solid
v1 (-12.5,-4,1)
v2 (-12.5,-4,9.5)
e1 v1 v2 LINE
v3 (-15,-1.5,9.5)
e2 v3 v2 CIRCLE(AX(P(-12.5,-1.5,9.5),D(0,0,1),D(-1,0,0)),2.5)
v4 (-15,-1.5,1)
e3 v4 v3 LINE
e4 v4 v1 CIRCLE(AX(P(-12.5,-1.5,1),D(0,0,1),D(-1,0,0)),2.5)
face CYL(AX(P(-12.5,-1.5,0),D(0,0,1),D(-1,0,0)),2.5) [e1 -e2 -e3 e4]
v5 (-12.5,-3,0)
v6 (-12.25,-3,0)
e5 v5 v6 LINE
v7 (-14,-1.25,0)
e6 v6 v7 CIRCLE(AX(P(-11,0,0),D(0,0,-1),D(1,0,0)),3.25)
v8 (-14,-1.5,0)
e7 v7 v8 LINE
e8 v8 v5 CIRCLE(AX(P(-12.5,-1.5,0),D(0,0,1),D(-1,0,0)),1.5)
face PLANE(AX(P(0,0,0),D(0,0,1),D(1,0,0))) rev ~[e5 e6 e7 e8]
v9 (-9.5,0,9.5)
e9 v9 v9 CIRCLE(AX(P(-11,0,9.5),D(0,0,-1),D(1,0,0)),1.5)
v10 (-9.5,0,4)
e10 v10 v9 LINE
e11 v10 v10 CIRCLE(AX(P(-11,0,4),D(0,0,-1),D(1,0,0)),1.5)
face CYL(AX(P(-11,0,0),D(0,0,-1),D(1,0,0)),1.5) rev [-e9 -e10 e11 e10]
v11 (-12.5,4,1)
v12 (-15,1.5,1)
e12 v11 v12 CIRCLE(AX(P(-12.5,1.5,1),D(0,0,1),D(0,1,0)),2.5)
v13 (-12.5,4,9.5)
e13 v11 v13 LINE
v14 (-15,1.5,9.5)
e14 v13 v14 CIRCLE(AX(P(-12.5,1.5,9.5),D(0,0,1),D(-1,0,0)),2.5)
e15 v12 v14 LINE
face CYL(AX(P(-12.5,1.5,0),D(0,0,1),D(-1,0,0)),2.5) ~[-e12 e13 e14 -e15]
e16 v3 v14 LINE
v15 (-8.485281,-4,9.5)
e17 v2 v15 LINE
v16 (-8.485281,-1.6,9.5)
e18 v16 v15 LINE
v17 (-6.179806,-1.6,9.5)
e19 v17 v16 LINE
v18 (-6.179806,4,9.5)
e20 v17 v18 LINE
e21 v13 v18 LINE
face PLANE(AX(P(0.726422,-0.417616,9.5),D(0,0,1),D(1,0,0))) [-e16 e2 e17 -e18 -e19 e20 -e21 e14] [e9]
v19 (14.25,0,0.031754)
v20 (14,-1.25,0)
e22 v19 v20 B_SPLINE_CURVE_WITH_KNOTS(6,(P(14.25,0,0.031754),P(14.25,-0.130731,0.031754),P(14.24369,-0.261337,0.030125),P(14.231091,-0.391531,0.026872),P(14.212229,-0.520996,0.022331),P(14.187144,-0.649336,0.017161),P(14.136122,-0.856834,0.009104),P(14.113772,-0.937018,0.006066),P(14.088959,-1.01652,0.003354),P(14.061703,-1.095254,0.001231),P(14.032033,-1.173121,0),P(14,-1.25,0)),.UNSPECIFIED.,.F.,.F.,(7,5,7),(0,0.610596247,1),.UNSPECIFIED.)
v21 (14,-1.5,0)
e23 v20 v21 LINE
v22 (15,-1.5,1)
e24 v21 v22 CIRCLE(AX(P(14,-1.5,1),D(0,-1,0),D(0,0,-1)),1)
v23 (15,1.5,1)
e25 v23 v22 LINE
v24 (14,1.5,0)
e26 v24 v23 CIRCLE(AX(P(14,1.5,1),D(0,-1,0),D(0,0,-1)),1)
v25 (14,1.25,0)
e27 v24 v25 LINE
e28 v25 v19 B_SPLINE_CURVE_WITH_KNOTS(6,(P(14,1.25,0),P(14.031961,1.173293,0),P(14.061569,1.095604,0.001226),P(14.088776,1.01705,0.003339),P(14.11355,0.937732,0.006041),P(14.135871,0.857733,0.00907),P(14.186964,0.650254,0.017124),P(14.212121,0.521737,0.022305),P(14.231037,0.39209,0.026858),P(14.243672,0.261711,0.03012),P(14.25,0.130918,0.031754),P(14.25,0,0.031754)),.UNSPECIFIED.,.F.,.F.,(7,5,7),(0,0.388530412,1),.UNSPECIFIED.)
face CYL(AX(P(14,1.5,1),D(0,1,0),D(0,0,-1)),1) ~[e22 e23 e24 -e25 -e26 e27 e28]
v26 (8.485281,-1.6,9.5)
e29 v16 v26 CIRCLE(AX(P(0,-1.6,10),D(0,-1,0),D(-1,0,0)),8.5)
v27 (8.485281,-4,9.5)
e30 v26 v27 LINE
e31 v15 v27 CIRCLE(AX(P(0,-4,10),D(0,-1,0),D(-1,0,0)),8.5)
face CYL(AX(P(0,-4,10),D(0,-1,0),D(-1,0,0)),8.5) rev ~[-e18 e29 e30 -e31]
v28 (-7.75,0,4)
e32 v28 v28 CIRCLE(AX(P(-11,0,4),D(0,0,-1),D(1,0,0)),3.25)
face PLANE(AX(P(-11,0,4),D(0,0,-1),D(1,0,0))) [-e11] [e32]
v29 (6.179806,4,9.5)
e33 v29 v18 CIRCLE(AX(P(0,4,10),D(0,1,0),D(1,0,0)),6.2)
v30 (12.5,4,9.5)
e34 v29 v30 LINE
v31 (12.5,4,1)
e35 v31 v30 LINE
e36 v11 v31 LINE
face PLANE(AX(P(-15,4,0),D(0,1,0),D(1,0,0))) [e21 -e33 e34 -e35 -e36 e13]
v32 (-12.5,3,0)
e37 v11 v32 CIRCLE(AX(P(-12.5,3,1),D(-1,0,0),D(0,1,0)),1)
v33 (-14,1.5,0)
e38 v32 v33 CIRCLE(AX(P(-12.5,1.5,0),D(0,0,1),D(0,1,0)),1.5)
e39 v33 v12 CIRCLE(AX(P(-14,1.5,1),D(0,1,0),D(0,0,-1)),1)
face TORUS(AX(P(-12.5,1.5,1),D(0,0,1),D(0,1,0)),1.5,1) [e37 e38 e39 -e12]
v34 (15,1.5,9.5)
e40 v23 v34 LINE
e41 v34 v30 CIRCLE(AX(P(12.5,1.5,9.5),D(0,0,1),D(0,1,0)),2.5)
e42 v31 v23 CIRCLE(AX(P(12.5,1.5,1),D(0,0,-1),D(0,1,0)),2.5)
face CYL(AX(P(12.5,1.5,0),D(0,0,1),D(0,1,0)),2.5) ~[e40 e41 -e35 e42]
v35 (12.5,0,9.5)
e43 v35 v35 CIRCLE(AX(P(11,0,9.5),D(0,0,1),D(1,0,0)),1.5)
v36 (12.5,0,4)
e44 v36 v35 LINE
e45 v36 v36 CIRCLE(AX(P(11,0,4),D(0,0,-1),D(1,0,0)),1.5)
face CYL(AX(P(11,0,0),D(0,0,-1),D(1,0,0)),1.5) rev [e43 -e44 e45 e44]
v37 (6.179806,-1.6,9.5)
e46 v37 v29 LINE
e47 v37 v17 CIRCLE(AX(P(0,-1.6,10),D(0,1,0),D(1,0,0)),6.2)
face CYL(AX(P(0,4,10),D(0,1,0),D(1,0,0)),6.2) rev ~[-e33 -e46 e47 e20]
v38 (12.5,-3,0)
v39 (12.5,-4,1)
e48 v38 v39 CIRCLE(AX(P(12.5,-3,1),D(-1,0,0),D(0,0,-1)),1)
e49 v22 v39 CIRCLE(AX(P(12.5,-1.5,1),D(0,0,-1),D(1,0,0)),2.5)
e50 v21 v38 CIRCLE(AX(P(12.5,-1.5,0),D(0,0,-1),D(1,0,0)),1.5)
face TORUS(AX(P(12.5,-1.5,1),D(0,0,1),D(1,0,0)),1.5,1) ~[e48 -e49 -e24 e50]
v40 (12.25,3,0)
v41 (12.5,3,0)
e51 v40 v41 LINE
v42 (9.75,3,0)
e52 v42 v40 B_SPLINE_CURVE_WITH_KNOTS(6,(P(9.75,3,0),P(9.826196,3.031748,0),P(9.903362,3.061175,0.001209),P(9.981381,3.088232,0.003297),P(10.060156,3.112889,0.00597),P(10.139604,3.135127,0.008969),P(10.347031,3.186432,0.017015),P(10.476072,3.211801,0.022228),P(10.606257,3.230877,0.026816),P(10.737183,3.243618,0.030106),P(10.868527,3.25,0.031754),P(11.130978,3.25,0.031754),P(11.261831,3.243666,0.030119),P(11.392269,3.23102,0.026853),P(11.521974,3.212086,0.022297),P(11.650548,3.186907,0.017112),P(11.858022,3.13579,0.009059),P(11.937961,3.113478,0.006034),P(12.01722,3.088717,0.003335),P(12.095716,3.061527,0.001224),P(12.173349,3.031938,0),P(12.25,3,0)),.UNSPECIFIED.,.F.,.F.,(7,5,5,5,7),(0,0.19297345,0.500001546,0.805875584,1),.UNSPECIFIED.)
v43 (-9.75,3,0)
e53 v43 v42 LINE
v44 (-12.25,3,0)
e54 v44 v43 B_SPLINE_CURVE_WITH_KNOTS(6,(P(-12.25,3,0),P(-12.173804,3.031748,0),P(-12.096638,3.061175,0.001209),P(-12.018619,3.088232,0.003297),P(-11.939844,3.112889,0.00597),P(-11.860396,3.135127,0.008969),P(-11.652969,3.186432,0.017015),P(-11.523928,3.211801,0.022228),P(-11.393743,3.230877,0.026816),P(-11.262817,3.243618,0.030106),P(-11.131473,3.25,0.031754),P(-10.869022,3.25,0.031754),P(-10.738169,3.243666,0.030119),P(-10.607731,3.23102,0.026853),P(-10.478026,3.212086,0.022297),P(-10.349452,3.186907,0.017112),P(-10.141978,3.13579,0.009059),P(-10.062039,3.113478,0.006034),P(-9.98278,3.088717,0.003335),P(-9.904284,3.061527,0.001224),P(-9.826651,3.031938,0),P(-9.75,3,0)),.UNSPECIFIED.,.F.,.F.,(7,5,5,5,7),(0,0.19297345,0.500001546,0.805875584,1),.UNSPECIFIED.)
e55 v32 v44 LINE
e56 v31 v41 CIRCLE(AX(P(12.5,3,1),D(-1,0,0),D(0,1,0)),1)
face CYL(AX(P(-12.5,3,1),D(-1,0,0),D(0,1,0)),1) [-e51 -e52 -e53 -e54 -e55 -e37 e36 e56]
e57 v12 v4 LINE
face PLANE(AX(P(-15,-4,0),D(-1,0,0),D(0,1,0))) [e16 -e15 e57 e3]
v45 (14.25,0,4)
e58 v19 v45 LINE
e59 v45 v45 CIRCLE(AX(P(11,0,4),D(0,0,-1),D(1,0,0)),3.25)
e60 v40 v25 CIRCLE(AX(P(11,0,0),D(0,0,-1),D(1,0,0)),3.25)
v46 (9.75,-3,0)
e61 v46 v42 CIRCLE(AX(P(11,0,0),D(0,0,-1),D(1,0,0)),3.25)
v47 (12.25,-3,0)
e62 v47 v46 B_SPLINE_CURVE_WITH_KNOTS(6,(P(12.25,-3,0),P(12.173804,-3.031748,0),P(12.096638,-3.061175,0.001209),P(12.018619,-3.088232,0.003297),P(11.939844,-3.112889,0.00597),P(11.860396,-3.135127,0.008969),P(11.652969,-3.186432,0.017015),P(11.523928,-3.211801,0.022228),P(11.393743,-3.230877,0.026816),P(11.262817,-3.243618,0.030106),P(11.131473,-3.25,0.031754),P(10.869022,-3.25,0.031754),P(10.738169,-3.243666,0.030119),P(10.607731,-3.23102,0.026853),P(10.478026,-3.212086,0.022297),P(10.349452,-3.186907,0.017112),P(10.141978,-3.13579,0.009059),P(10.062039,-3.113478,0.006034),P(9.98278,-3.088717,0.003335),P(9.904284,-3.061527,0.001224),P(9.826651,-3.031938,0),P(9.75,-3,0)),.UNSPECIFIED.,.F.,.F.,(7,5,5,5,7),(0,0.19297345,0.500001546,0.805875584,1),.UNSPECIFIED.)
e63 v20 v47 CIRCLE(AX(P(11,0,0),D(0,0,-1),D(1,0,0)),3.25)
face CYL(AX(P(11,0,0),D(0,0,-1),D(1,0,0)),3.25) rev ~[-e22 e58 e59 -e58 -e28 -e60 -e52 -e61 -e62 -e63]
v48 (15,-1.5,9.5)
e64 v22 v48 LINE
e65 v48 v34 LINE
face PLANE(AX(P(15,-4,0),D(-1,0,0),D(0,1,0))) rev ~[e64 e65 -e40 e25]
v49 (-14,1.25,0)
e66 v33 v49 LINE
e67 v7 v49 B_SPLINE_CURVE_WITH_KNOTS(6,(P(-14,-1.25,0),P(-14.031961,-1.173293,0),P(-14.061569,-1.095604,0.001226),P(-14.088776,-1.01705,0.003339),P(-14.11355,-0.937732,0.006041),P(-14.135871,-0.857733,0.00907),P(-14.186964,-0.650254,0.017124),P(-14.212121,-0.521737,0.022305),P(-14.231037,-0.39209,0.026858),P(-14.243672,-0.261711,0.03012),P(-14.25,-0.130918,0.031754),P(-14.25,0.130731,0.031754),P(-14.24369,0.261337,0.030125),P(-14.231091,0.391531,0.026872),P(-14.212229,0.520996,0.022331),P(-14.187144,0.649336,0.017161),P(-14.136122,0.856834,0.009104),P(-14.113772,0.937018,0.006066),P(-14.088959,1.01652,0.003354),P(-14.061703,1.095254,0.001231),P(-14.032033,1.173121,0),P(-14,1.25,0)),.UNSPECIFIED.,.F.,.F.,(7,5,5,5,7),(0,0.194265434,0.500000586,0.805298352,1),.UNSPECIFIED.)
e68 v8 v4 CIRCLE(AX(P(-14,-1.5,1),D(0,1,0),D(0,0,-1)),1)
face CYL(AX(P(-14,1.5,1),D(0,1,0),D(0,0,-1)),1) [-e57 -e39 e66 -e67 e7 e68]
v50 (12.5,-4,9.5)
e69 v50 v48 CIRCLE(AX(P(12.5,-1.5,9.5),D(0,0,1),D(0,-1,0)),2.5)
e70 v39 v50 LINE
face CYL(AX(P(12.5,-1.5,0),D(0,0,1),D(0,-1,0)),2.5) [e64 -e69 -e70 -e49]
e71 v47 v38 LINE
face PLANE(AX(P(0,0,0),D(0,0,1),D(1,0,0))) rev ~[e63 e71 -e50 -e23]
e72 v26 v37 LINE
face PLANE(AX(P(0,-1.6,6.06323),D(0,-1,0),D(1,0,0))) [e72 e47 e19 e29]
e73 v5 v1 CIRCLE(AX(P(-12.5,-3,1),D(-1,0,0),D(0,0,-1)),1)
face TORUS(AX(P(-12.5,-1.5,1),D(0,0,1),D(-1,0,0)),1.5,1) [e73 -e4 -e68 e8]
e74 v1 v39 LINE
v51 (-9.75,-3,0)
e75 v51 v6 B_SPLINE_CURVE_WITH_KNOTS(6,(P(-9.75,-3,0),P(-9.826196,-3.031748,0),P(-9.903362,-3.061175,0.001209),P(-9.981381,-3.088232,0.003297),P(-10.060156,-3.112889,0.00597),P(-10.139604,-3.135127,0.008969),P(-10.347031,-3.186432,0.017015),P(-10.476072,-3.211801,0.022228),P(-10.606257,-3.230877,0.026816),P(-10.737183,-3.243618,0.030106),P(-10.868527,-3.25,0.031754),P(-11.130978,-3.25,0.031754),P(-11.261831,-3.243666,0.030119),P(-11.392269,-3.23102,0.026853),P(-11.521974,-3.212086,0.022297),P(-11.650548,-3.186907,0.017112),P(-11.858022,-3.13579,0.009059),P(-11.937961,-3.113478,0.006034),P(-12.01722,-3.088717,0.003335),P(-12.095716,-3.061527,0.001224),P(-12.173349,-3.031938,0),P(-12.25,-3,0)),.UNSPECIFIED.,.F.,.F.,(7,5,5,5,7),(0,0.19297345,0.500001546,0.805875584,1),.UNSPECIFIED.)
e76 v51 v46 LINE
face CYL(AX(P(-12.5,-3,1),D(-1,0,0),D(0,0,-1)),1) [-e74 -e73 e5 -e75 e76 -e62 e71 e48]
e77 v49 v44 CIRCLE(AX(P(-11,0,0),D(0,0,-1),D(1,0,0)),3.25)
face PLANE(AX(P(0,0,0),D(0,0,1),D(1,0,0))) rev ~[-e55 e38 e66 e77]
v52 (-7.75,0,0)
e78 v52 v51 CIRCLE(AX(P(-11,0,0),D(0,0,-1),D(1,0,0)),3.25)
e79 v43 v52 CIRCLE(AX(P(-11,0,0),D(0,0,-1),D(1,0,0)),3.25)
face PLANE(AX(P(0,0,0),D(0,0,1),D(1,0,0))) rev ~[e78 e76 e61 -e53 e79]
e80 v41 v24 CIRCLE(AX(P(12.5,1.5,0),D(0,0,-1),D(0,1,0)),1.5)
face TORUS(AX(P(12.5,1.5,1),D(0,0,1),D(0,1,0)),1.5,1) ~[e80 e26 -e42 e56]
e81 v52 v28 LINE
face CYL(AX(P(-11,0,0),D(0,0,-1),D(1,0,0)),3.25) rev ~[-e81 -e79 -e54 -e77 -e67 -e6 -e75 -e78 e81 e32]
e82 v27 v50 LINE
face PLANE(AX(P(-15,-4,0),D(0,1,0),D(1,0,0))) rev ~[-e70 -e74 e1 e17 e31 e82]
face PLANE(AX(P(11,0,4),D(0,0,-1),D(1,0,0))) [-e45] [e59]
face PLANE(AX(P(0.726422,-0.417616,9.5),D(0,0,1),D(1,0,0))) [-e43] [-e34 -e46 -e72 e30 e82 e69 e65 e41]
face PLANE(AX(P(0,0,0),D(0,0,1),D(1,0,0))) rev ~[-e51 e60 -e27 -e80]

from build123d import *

# Parameters (mm, degrees)
F0_W         = 30
F0_H         = 8
F0_R         = 1.5
F1_DEPTH     = 10
F2_R         = 3.25
F2_R_2       = 1.5
F3_DEPTH     = 4
F5_DEPTH     = 8.001
F7_DEPTH     = 2.4
F8_R         = 2.5
F9_T1_DEPTH  = 3
F9_T3_DEPTH  = 25
F9_T6_ANGLE  = 90
F9_T8_ANGLE  = 90
F9_T10_ANGLE = 90
F9_T12_ANGLE = 90
F10_W        = 35.437501967
F10_H        = 11.6335232742
F10_R        = 1.5
F11_DEPTH    = 0.5


# Not quite as in the source:
# - a fillet or chamfer that OpenCascade refuses, or shapes differently, is made with other operations: its cross-section is extruded or revolved along the edge and cut away or added


with BuildPart() as f1:
    # F0 (on Top) → F1 (new body)
    with BuildSketch(Plane.XY):
        Rectangle(F0_W, F0_H)
        with Locations((-11, 0)):
            Circle(F0_R, mode=Mode.SUBTRACT)
        with Locations((11, 0)):
            Circle(F0_R, mode=Mode.SUBTRACT)
    extrude(amount=F1_DEPTH)

    # F2 (on face) → F3 (cut)
    with BuildSketch(Plane(origin=(0, 0, 0), x_dir=(1, 0, 0), z_dir=(0, 0, -1))):
        with Locations((11, 0)):
            Circle(F2_R)
        with Locations((11, 0)):
            Circle(F2_R_2, mode=Mode.SUBTRACT)
        with Locations((-11, 0)):
            Circle(F2_R)
        with Locations((-11, 0)):
            Circle(F2_R_2, mode=Mode.SUBTRACT)
    extrude(amount=-F3_DEPTH, mode=Mode.SUBTRACT)

    # F4 (on face) → F5 (cut, through all)
    with BuildSketch(Plane(origin=(0, 4, 0), x_dir=(-1, 0, 0), z_dir=(0, 1, 0))):
        with BuildLine():
            ThreePointArc((-6.2, 10), (0, 3.8), (6.2, 10))
            Line((6.2, 10), (-6.2, 10))
        make_face()
    extrude(amount=-F5_DEPTH, mode=Mode.SUBTRACT)

    # F6 (on face) → F7 (cut)
    with BuildSketch(Plane.XZ.offset(4)):
        with BuildLine():
            ThreePointArc((-8.5, 10), (0, 1.5), (8.5, 10))
            Line((8.5, 10), (6.2, 10))
            ThreePointArc((6.2, 10), (0, 3.8), (-6.2, 10))
            Line((-6.2, 10), (-8.5, 10))
        make_face()
    extrude(amount=-F7_DEPTH, mode=Mode.SUBTRACT)

    # F8
    f8_edges = [f1.edges().sort_by_distance(p)[0] for p in [
        (15, 4, 5),
        (15, -4, 5),
        (-15, 4, 5),
        (-15, -4, 5),
    ]]
    fillet(f8_edges, radius=F8_R)

    # F9: fillet of radius 1 on 8 edges, made by hand

    # F9_s2 → F9_t1 (cut)
    with BuildSketch(Plane.XZ.offset(-1.5)):
        with BuildLine():
            ThreePointArc((14, 0), (14.7071067812, 0.2928932188), (15, 1))
            Line((15, 1), (15, 0))
            Line((15, 0), (14, 0))
        make_face()
        with BuildLine():
            ThreePointArc((-14, 0), (-14.7071067812, 0.2928932188), (-15, 1))
            Line((-15, 1), (-15, 0))
            Line((-15, 0), (-14, 0))
        make_face()
    extrude(amount=F9_T1_DEPTH, mode=Mode.SUBTRACT)

    # F9_s4 → F9_t3 (cut)
    with BuildSketch(Plane.YZ.offset(-12.5)):
        with BuildLine():
            ThreePointArc((4, 1), (3.7071067812, 0.2928932188), (3, 0))
            Line((3, 0), (4, 0))
            Line((4, 0), (4, 1))
        make_face()
        with BuildLine():
            ThreePointArc((-3, 0), (-3.7071067812, 0.2928932188), (-4, 1))
            Line((-4, 1), (-4, 0))
            Line((-4, 0), (-3, 0))
        make_face()
    extrude(amount=F9_T3_DEPTH, mode=Mode.SUBTRACT)

    # F9_s5 → F9_t6 (revolve, cut)
    with BuildSketch(Plane.YZ.offset(12.5)):
        with BuildLine():
            ThreePointArc((3, 0), (3.7071067812, 0.2928932188), (4, 1))
            Line((4, 1), (4, 0))
            Line((4, 0), (3, 0))
        make_face()
    revolve(axis=Axis((12.5, 1.5, 0), (0, 0, -1)), revolution_arc=F9_T6_ANGLE, mode=Mode.SUBTRACT)

    # F9_s7 → F9_t8 (revolve, cut)
    with BuildSketch(Plane.YZ.offset(-12.5)):
        with BuildLine():
            ThreePointArc((3, 0), (3.7071067812, 0.2928932188), (4, 1))
            Line((4, 1), (4, 0))
            Line((4, 0), (3, 0))
        make_face()
    revolve(axis=Axis((-12.5, 1.5, 0), (0, 0, 1)), revolution_arc=F9_T8_ANGLE, mode=Mode.SUBTRACT)

    # F9_s9 → F9_t10 (revolve, cut)
    with BuildSketch(Plane.XZ.offset(1.5)):
        with BuildLine():
            ThreePointArc((14, 0), (14.7071067812, 0.2928932188), (15, 1))
            Line((15, 1), (15, 0))
            Line((15, 0), (14, 0))
        make_face()
    revolve(axis=Axis((12.5, -1.5, 0), (0, 0, -1)), revolution_arc=F9_T10_ANGLE, mode=Mode.SUBTRACT)

    # F9_s11 → F9_t12 (revolve, cut)
    with BuildSketch(Plane.XZ.offset(1.5)):
        with BuildLine():
            ThreePointArc((-14, 0), (-14.7071067812, 0.2928932188), (-15, 1))
            Line((-15, 1), (-15, 0))
            Line((-15, 0), (-14, 0))
        make_face()
    revolve(axis=Axis((-12.5, -1.5, 0), (0, 0, 1)), revolution_arc=F9_T12_ANGLE, mode=Mode.SUBTRACT)

    # F10 (on face) → F11 (cut)
    with BuildSketch(Plane.XY.offset(10)):
        with Locations((0.726422295, -0.4176155198)):
            Rectangle(F10_W, F10_H)
        with BuildLine():
            Line((12.5, -4), (8.5, -4))
            Line((8.5, -4), (8.5, -1.6))
            Line((8.5, -1.6), (6.2, -1.6))
            Line((6.2, -1.6), (6.2, 4))
            Line((6.2, 4), (12.5, 4))
            ThreePointArc((12.5, 4), (14.267766953, 3.267766953), (15, 1.5))
            Line((15, 1.5), (15, -1.5))
            ThreePointArc((15, -1.5), (14.267766953, -3.267766953), (12.5, -4))
        make_face(mode=Mode.SUBTRACT)
        with BuildLine():
            Line((8.5, -1.6), (8.5, -4))
            Line((8.5, -4), (12.5, -4))
            ThreePointArc((12.5, -4), (14.267766953, -3.267766953), (15, -1.5))
            Line((15, -1.5), (15, 1.5))
            ThreePointArc((15, 1.5), (14.267766953, 3.267766953), (12.5, 4))
            Line((12.5, 4), (6.2, 4))
            Line((6.2, 4), (6.2, -1.6))
            Line((6.2, -1.6), (8.5, -1.6))
        make_face()
        with Locations((11, 0)):
            Circle(F10_R, mode=Mode.SUBTRACT)
    extrude(amount=-F11_DEPTH, mode=Mode.SUBTRACT)


solid = f1.part
